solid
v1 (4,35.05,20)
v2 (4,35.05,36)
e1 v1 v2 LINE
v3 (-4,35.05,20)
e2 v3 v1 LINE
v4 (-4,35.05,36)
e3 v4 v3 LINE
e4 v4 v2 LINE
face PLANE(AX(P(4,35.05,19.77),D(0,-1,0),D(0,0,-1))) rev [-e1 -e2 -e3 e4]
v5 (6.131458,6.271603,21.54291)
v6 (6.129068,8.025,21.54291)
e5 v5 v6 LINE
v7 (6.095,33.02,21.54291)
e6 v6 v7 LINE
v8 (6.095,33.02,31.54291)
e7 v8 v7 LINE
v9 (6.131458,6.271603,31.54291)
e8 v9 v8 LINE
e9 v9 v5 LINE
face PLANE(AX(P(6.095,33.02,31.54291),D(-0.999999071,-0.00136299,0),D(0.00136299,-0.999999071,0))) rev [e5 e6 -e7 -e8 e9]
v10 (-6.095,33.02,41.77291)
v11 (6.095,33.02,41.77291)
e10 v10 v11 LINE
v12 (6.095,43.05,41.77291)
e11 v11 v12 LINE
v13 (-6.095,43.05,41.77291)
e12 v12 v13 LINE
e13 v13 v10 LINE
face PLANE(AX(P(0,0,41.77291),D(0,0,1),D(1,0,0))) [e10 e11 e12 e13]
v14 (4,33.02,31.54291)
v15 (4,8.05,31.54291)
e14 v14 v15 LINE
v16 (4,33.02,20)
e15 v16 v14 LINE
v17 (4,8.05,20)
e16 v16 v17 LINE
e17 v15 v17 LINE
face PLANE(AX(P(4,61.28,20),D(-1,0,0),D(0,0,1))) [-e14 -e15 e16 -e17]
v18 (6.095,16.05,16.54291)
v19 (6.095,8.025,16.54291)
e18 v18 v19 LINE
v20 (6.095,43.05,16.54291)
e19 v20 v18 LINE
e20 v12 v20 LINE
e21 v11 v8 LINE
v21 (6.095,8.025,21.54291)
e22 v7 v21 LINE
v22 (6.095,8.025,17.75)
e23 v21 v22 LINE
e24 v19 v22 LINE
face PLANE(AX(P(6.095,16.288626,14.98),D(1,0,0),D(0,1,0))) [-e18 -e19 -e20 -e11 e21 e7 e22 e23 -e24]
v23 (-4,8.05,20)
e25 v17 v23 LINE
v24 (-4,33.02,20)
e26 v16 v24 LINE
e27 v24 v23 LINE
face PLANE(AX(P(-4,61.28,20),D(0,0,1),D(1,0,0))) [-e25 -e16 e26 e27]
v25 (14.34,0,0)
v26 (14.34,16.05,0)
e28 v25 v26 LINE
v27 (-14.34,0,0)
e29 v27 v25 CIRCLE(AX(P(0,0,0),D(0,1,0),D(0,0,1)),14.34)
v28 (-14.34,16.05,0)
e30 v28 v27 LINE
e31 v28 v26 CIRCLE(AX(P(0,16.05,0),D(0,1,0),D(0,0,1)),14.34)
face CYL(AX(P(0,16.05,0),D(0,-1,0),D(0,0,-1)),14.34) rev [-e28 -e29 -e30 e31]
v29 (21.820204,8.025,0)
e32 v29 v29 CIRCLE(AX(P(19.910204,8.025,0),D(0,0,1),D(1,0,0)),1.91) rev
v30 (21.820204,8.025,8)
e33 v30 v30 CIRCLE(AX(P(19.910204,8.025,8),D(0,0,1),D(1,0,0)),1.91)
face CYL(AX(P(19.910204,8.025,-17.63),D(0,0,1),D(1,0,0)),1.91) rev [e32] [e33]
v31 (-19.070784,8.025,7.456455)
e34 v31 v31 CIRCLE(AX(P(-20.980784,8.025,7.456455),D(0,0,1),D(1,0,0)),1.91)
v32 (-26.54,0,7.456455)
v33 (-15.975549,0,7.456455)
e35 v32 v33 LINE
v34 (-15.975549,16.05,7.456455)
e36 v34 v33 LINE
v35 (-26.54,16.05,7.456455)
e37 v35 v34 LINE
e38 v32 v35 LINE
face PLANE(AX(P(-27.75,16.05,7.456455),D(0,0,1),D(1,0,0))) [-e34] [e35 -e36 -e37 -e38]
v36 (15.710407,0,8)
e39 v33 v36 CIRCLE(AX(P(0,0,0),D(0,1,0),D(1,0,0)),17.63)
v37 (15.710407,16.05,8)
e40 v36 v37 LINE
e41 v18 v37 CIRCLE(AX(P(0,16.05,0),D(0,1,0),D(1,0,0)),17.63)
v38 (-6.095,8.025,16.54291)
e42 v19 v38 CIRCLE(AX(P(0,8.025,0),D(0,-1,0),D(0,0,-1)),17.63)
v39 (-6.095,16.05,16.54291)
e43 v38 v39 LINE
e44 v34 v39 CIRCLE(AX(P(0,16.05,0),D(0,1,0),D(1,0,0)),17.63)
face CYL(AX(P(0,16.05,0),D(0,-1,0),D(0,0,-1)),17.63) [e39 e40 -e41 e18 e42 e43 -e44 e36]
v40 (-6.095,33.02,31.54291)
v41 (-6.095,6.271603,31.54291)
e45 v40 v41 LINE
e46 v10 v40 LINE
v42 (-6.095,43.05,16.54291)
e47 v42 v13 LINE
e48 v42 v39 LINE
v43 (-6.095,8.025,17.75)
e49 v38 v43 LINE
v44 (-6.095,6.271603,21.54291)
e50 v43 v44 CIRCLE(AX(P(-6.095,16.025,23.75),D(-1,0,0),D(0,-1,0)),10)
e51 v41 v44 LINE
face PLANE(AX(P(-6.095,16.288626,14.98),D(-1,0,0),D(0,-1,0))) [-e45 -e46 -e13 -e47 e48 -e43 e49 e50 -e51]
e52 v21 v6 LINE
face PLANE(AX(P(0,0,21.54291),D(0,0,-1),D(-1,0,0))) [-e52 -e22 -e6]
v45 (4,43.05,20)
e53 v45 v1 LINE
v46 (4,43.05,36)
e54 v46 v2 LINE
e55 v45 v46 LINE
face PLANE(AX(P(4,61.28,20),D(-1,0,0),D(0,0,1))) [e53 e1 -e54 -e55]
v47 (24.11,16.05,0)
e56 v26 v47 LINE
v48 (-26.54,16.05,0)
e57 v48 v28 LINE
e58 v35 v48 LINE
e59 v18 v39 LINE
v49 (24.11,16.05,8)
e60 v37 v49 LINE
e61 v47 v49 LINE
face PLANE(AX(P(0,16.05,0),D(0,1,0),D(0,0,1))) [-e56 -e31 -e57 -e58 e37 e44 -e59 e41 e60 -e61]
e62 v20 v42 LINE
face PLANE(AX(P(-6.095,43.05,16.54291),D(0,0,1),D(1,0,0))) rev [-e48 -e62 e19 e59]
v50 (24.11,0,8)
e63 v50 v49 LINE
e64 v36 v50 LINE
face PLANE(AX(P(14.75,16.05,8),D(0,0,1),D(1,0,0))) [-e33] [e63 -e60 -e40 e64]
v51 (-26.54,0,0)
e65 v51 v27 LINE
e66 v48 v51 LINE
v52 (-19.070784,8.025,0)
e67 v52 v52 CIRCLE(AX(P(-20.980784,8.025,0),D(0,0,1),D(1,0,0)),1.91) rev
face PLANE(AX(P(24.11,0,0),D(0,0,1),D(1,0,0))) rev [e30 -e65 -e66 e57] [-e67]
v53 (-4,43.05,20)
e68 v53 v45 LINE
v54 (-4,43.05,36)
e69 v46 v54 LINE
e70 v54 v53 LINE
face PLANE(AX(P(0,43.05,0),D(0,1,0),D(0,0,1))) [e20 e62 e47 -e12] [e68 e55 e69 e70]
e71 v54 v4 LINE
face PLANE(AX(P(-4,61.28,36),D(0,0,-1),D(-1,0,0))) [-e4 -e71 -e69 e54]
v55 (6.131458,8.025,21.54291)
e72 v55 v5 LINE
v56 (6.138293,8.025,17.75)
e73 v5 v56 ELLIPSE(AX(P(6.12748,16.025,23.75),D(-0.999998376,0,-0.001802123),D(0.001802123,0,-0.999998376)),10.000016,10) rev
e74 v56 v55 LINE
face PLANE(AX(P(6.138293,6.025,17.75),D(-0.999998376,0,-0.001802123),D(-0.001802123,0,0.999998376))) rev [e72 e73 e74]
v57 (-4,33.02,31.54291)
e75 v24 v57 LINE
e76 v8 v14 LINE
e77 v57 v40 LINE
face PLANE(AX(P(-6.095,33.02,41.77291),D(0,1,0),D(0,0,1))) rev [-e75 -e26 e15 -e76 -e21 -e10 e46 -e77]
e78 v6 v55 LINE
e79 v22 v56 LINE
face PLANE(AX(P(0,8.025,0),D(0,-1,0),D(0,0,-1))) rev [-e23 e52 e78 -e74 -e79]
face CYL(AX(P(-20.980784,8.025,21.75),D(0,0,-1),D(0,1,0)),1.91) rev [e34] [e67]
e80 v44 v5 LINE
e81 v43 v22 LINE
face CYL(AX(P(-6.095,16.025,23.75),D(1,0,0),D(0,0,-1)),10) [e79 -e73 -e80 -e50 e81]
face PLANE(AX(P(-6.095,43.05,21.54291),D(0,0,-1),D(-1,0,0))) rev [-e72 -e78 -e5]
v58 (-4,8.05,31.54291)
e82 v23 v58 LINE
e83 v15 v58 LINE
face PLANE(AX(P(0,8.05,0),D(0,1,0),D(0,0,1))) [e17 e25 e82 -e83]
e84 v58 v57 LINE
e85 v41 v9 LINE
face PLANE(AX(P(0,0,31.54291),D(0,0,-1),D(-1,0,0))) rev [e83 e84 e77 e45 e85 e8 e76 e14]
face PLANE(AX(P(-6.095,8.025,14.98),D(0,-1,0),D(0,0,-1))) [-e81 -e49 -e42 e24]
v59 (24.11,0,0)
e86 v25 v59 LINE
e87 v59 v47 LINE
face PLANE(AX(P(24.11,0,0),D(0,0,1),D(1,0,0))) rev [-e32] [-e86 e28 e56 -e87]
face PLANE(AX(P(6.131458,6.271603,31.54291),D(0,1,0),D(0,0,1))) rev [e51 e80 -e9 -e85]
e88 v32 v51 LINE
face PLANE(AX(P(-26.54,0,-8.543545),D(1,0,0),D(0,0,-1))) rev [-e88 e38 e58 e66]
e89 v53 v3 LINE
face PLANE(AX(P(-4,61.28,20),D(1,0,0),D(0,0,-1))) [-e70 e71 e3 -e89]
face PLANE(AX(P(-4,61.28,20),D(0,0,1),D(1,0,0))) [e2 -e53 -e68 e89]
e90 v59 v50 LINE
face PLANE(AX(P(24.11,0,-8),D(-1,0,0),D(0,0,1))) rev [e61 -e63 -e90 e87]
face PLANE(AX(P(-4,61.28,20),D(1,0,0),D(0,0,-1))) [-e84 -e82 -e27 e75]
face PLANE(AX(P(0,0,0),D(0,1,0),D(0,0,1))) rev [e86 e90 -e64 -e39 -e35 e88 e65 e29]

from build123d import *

# Parameters (mm, degrees)
SKETCH_1_R                = 17.63
SKETCH_1_R_2              = 14.34
EXTRUDE_1_DEPTH           = 16.05
EXTRUDE_1_2_DEPTH         = 9.77
EXTRUDE_1_2_DEPTH_BACK    = 3
SKETCH_2_W                = 16
SKETCH_2_H                = 16.05
SKETCH_3_W                = 3.41
SKETCH_3_H                = 16
CUT_EXTRUDE_1_DEPTH       = 37.411121927
SKETCH_4_R                = 1.91
CUT_EXTRUDE_2_DEPTH       = 39.675463798
EXTRUDE_2_DEPTH           = 4
EXTRUDE_2_DEPTH_BACK      = 2.77
SKETCH_5_W                = 12.19
SKETCH_5_H                = 8.263625949
SKETCH_6_W                = 12.19
SKETCH_6_H                = 6.77
EXTRUDE_3_DEPTH           = 63
SKETCH_8_W                = 12.19
SKETCH_8_H                = 6.77
EXTRUDE_4_DEPTH           = 0.16
EXTRUDE_5_DEPTH           = 3.16
EXTRUDE_5_DEPTH_BACK      = 10
SKETCH_12_W               = 16
SKETCH_12_H               = 16.05
SKETCH_13_W               = 1.21
SKETCH_13_H               = 16
CUT_EXTRUDE_3_DEPTH       = 73.543164889
SKETCH_14_R               = 1.91
CUT_EXTRUDE_4_DEPTH       = 90.07387176
SKETCH_15_R               = 4.05
CUT_EXTRUDE_5_DEPTH       = 24
SKETCH_16_W               = 56.400519221
SKETCH_16_H               = 19.935010357
CUT_EXTRUDE_6_DEPTH       = 73.088971918
SKETCH_17_W               = 12.19
SKETCH_17_H               = 71.423625949
EXTRUDE_7_DEPTH           = 25
SKETCH_18_W               = 26.793372528
SKETCH_18_H               = 63.398625949
CUT_EXTRUDE_7_DEPTH       = 25
SKETCH_19_R               = 4
CUT_EXTRUDE_8_DEPTH       = 24
CUT_EXTRUDE_9_DEPTH       = 29
EXTRUDE_9_DEPTH           = 2
FILLET_1_R                = 10
SKETCH_24_W               = 12.19
SKETCH_24_H               = 5
EXTRUDE_10_DEPTH          = 27
SKETCH_27_W               = 12.19
SKETCH_27_H               = 10.03
EXTRUDE_11_DEPTH          = 20.23
CUT_EXTRUDE_10_DEPTH      = 45.23
CUT_EXTRUDE_10_DEPTH_BACK = 8
SKETCH_21_W               = 8
SKETCH_21_H               = 16
SKETCH_25_W               = 20.230462415
SKETCH_25_H               = 10.025
CUT_EXTRUDE_12_DEPTH      = 20.23
SKETCH_31_W               = 8
SKETCH_31_H               = 2.03
EXTRUDE_13_DEPTH          = 16.23
EXTRUDE_17_DEPTH          = 10


with BuildPart() as part:
    # 草圖1 → Extrude 1 (new body)
    with BuildSketch(Plane(origin=(0, 0, 0), x_dir=(1, 0, 0), z_dir=(0, 1, 0))):
        Circle(SKETCH_1_R)
        Circle(SKETCH_1_R_2, mode=Mode.SUBTRACT)
    extrude(amount=EXTRUDE_1_DEPTH)

    # 草圖2 → Extrude 1 2 (add, two sides: drawn at the far end of the back side and taken through both)
    with BuildSketch(Plane(origin=(17.75, 0, 0), x_dir=(0, 0, -1), z_dir=(1, 0, 0)).offset(-EXTRUDE_1_2_DEPTH_BACK)):
        with Locations((0, 8.025)):
            Rectangle(SKETCH_2_W, SKETCH_2_H)
    extrude(amount=EXTRUDE_1_2_DEPTH + EXTRUDE_1_2_DEPTH_BACK)

    # 草圖3 → 除料-伸長1 (cut, through all)
    with BuildSketch(Plane(origin=(0, 16.05, 0), x_dir=(1, 0, 0), z_dir=(0, 1, 0))):
        with Locations((25.815, 0)):
            Rectangle(SKETCH_3_W, SKETCH_3_H)
    extrude(amount=-CUT_EXTRUDE_1_DEPTH, mode=Mode.SUBTRACT)

    # 草圖4 → 除料-伸長2 (cut, through all)
    with BuildSketch(Plane.XY.offset(8)):
        with Locations((19.910203689, 8.025)):
            Circle(SKETCH_4_R)
    extrude(amount=-CUT_EXTRUDE_2_DEPTH, mode=Mode.SUBTRACT)

    # 草圖5 → 填料-伸長2 (add, two sides: drawn at the far end of the back side and taken through both)
    with BuildSketch(Plane.XY.offset(17.75).offset(-EXTRUDE_2_DEPTH_BACK)):
        with Locations((0, 12.156812974)):
            Rectangle(SKETCH_5_W, SKETCH_5_H)
    extrude(amount=EXTRUDE_2_DEPTH + EXTRUDE_2_DEPTH_BACK)

    # 草圖6 → 填料-伸長3 (add)
    with BuildSketch(Plane(origin=(0, 16.288625949, 0), x_dir=(1, 0, 0), z_dir=(0, 1, 0))):
        with Locations((0, -18.365)):
            Rectangle(SKETCH_6_W, SKETCH_6_H)
    extrude(amount=EXTRUDE_3_DEPTH)

    # 草圖8 → 填料-伸長4 (add)
    with BuildSketch(Plane(origin=(0, 79.288625949, 0), x_dir=(1, 0, 0), z_dir=(0, 1, 0))):
        with Locations((0, -18.365)):
            Rectangle(SKETCH_8_W, SKETCH_8_H)
    extrude(amount=EXTRUDE_4_DEPTH)

    # 草圖12 → 填料-伸長5 (add, two sides: drawn at the far end of the back side and taken through both)
    with BuildSketch(Plane(origin=(-17.75, 0, 0), x_dir=(0, 0, -1), z_dir=(1, 0, 0)).offset(-EXTRUDE_5_DEPTH_BACK)):
        with Locations((0.543544944, 8.025)):
            Rectangle(SKETCH_12_W, SKETCH_12_H)
    extrude(amount=EXTRUDE_5_DEPTH + EXTRUDE_5_DEPTH_BACK)

    # 草圖13 → 除料-伸長3 (cut, through all)
    with BuildSketch(Plane(origin=(0, 16.05, 0), x_dir=(1, 0, 0), z_dir=(0, 1, 0))):
        with Locations((-27.145, 0.543544944)):
            Rectangle(SKETCH_13_W, SKETCH_13_H)
    extrude(amount=-CUT_EXTRUDE_3_DEPTH, mode=Mode.SUBTRACT)

    # 草圖14 → 除料-伸長4 (cut, through all)
    with BuildSketch(Plane(origin=(0, 0, -8.543544944), x_dir=(-1, 0, 0), z_dir=(0, 0, -1))):
        with Locations(Location((20.980783679, 8.025, 0), (0, 0, 90))):
            Circle(SKETCH_14_R)
    extrude(amount=-CUT_EXTRUDE_4_DEPTH, mode=Mode.SUBTRACT)

    # 草圖15 → 除料-伸長5 (cut)
    with BuildSketch(Plane(origin=(0, 79.448625949, 0), x_dir=(1, 0, 0), z_dir=(0, 1, 0))):
        with Locations((0, -14.98)):
            Circle(SKETCH_15_R)
    extrude(amount=-CUT_EXTRUDE_5_DEPTH, mode=Mode.SUBTRACT)

    # 草圖16 → 除料-伸長6 (cut, through all)
    with BuildSketch(Plane(origin=(0, 16.05, 0), x_dir=(1, 0, 0), z_dir=(0, 1, 0))):
        with Locations((-4.090259611, 9.967505179)):
            Rectangle(SKETCH_16_W, SKETCH_16_H)
    extrude(amount=-CUT_EXTRUDE_6_DEPTH, mode=Mode.SUBTRACT)

    # 草圖17 → 填料-伸長7 (add)
    with BuildSketch(Plane.XY.offset(21.75)):
        with Locations((0, 43.736812975)):
            Rectangle(SKETCH_17_W, SKETCH_17_H)
    extrude(amount=EXTRUDE_7_DEPTH)

    # 草圖18 → 除料-伸長7 (cut)
    with BuildSketch(Plane.ZY.offset(6.095)):
        with Locations((28.376686264, 47.749312975)):
            Rectangle(SKETCH_18_W, SKETCH_18_H)
    extrude(amount=-CUT_EXTRUDE_7_DEPTH, mode=Mode.SUBTRACT)

    # 草圖19 → 除料-伸長8 (cut)
    with BuildSketch(Plane(origin=(0, 79.448625949, 0), x_dir=(1, 0, 0), z_dir=(0, 1, 0))):
        with Locations((0, -41.773372528)):
            Circle(SKETCH_19_R)
    extrude(amount=-CUT_EXTRUDE_8_DEPTH, mode=Mode.SUBTRACT)

    # 草圖20 → 除料-伸長9 (cut)
    with BuildSketch(Plane(origin=(6.095, 0, 0), x_dir=(0, 0, -1), z_dir=(1, 0, 0))):
        Polygon((-41.773372528, 16.05), (-41.773372528, 8.025), (-46.75, 8.025), (-46.75, 79.448625949), (-41.773372528, 79.448625949), align=None)
    extrude(amount=-CUT_EXTRUDE_9_DEPTH, mode=Mode.SUBTRACT)

    # 草圖23 → 填料-伸長9 (add)
    with BuildSketch(Plane.XZ.offset(-8.025)):
        Polygon((-6.095, 41.773372528), (-6.095, 17.75), (6.13829314, 17.75), (6.095, 41.773372528), align=None)
    extrude(amount=EXTRUDE_9_DEPTH)

    # 圓角1
    # the kernel refuses this fillet: 10 mm, written as the material it takes off along each edge
    with BuildSketch(Plane(origin=(-21.095, 6.025, 17.75), x_dir=(0, 1, 0), z_dir=(1, 0, 0))) as fillet_1_piece_1:
        with BuildLine():
            CenterArc((10, 6), FILLET_1_R, 180, 36.869897646)
            Line((0, 6), (0, 0))
            Line((0, 0), (2, 0))
        make_face()
    extrude(amount=42.23329314, mode=Mode.SUBTRACT)

    # 草圖24 → 填料-伸長10 (add)
    with BuildSketch(Plane(origin=(0, 16.05, 0), x_dir=(1, 0, 0), z_dir=(0, 1, 0))):
        with Locations((0, -19.042910113)):
            Rectangle(SKETCH_24_W, SKETCH_24_H)
    extrude(amount=EXTRUDE_10_DEPTH)

    # 草圖27 → 填料-伸長11 (add)
    with BuildSketch(Plane.XY.offset(21.542910113)):
        with Locations((0, 38.035)):
            Rectangle(SKETCH_27_W, SKETCH_27_H)
    extrude(amount=EXTRUDE_11_DEPTH)

    # 草圖21 → 除料-伸長10 (cut, two sides: drawn at the far end of the back side and taken through both)
    with BuildSketch(Plane(origin=(0, 16.05, 0), x_dir=(1, 0, 0), z_dir=(0, 1, 0)).offset(-CUT_EXTRUDE_10_DEPTH_BACK)):
        with Locations((0, -28)):
            Rectangle(SKETCH_21_W, SKETCH_21_H)
    extrude(amount=CUT_EXTRUDE_10_DEPTH + CUT_EXTRUDE_10_DEPTH_BACK, mode=Mode.SUBTRACT)

    # 草圖25 → 除料-伸長12 (cut)
    with BuildSketch(Plane.ZY.offset(6.095)):
        with Locations((31.658141321, 11.0375)):
            Rectangle(SKETCH_25_W, SKETCH_25_H)
    extrude(amount=-CUT_EXTRUDE_12_DEPTH, mode=Mode.SUBTRACT)

    # 草圖31 → 填料-伸長13 (add)
    with BuildSketch(Plane(origin=(0, 0, 36), x_dir=(-1, 0, 0), z_dir=(0, 0, -1))):
        with Locations((0, 34.035)):
            Rectangle(SKETCH_31_W, SKETCH_31_H)
    extrude(amount=EXTRUDE_13_DEPTH)

    # 草圖33 → 填料-伸長17 (add)
    with BuildSketch(Plane.XY.offset(21.542910113)):
        Polygon((-6.095, 33.02), (-4, 33.02), (-4, 8.05), (4, 8.05), (4, 33.02), (6.095, 33.02), (6.131457839, 6.271602939), (-6.095, 6.271602939), align=None)
    extrude(amount=EXTRUDE_17_DEPTH)


solid = part.part
